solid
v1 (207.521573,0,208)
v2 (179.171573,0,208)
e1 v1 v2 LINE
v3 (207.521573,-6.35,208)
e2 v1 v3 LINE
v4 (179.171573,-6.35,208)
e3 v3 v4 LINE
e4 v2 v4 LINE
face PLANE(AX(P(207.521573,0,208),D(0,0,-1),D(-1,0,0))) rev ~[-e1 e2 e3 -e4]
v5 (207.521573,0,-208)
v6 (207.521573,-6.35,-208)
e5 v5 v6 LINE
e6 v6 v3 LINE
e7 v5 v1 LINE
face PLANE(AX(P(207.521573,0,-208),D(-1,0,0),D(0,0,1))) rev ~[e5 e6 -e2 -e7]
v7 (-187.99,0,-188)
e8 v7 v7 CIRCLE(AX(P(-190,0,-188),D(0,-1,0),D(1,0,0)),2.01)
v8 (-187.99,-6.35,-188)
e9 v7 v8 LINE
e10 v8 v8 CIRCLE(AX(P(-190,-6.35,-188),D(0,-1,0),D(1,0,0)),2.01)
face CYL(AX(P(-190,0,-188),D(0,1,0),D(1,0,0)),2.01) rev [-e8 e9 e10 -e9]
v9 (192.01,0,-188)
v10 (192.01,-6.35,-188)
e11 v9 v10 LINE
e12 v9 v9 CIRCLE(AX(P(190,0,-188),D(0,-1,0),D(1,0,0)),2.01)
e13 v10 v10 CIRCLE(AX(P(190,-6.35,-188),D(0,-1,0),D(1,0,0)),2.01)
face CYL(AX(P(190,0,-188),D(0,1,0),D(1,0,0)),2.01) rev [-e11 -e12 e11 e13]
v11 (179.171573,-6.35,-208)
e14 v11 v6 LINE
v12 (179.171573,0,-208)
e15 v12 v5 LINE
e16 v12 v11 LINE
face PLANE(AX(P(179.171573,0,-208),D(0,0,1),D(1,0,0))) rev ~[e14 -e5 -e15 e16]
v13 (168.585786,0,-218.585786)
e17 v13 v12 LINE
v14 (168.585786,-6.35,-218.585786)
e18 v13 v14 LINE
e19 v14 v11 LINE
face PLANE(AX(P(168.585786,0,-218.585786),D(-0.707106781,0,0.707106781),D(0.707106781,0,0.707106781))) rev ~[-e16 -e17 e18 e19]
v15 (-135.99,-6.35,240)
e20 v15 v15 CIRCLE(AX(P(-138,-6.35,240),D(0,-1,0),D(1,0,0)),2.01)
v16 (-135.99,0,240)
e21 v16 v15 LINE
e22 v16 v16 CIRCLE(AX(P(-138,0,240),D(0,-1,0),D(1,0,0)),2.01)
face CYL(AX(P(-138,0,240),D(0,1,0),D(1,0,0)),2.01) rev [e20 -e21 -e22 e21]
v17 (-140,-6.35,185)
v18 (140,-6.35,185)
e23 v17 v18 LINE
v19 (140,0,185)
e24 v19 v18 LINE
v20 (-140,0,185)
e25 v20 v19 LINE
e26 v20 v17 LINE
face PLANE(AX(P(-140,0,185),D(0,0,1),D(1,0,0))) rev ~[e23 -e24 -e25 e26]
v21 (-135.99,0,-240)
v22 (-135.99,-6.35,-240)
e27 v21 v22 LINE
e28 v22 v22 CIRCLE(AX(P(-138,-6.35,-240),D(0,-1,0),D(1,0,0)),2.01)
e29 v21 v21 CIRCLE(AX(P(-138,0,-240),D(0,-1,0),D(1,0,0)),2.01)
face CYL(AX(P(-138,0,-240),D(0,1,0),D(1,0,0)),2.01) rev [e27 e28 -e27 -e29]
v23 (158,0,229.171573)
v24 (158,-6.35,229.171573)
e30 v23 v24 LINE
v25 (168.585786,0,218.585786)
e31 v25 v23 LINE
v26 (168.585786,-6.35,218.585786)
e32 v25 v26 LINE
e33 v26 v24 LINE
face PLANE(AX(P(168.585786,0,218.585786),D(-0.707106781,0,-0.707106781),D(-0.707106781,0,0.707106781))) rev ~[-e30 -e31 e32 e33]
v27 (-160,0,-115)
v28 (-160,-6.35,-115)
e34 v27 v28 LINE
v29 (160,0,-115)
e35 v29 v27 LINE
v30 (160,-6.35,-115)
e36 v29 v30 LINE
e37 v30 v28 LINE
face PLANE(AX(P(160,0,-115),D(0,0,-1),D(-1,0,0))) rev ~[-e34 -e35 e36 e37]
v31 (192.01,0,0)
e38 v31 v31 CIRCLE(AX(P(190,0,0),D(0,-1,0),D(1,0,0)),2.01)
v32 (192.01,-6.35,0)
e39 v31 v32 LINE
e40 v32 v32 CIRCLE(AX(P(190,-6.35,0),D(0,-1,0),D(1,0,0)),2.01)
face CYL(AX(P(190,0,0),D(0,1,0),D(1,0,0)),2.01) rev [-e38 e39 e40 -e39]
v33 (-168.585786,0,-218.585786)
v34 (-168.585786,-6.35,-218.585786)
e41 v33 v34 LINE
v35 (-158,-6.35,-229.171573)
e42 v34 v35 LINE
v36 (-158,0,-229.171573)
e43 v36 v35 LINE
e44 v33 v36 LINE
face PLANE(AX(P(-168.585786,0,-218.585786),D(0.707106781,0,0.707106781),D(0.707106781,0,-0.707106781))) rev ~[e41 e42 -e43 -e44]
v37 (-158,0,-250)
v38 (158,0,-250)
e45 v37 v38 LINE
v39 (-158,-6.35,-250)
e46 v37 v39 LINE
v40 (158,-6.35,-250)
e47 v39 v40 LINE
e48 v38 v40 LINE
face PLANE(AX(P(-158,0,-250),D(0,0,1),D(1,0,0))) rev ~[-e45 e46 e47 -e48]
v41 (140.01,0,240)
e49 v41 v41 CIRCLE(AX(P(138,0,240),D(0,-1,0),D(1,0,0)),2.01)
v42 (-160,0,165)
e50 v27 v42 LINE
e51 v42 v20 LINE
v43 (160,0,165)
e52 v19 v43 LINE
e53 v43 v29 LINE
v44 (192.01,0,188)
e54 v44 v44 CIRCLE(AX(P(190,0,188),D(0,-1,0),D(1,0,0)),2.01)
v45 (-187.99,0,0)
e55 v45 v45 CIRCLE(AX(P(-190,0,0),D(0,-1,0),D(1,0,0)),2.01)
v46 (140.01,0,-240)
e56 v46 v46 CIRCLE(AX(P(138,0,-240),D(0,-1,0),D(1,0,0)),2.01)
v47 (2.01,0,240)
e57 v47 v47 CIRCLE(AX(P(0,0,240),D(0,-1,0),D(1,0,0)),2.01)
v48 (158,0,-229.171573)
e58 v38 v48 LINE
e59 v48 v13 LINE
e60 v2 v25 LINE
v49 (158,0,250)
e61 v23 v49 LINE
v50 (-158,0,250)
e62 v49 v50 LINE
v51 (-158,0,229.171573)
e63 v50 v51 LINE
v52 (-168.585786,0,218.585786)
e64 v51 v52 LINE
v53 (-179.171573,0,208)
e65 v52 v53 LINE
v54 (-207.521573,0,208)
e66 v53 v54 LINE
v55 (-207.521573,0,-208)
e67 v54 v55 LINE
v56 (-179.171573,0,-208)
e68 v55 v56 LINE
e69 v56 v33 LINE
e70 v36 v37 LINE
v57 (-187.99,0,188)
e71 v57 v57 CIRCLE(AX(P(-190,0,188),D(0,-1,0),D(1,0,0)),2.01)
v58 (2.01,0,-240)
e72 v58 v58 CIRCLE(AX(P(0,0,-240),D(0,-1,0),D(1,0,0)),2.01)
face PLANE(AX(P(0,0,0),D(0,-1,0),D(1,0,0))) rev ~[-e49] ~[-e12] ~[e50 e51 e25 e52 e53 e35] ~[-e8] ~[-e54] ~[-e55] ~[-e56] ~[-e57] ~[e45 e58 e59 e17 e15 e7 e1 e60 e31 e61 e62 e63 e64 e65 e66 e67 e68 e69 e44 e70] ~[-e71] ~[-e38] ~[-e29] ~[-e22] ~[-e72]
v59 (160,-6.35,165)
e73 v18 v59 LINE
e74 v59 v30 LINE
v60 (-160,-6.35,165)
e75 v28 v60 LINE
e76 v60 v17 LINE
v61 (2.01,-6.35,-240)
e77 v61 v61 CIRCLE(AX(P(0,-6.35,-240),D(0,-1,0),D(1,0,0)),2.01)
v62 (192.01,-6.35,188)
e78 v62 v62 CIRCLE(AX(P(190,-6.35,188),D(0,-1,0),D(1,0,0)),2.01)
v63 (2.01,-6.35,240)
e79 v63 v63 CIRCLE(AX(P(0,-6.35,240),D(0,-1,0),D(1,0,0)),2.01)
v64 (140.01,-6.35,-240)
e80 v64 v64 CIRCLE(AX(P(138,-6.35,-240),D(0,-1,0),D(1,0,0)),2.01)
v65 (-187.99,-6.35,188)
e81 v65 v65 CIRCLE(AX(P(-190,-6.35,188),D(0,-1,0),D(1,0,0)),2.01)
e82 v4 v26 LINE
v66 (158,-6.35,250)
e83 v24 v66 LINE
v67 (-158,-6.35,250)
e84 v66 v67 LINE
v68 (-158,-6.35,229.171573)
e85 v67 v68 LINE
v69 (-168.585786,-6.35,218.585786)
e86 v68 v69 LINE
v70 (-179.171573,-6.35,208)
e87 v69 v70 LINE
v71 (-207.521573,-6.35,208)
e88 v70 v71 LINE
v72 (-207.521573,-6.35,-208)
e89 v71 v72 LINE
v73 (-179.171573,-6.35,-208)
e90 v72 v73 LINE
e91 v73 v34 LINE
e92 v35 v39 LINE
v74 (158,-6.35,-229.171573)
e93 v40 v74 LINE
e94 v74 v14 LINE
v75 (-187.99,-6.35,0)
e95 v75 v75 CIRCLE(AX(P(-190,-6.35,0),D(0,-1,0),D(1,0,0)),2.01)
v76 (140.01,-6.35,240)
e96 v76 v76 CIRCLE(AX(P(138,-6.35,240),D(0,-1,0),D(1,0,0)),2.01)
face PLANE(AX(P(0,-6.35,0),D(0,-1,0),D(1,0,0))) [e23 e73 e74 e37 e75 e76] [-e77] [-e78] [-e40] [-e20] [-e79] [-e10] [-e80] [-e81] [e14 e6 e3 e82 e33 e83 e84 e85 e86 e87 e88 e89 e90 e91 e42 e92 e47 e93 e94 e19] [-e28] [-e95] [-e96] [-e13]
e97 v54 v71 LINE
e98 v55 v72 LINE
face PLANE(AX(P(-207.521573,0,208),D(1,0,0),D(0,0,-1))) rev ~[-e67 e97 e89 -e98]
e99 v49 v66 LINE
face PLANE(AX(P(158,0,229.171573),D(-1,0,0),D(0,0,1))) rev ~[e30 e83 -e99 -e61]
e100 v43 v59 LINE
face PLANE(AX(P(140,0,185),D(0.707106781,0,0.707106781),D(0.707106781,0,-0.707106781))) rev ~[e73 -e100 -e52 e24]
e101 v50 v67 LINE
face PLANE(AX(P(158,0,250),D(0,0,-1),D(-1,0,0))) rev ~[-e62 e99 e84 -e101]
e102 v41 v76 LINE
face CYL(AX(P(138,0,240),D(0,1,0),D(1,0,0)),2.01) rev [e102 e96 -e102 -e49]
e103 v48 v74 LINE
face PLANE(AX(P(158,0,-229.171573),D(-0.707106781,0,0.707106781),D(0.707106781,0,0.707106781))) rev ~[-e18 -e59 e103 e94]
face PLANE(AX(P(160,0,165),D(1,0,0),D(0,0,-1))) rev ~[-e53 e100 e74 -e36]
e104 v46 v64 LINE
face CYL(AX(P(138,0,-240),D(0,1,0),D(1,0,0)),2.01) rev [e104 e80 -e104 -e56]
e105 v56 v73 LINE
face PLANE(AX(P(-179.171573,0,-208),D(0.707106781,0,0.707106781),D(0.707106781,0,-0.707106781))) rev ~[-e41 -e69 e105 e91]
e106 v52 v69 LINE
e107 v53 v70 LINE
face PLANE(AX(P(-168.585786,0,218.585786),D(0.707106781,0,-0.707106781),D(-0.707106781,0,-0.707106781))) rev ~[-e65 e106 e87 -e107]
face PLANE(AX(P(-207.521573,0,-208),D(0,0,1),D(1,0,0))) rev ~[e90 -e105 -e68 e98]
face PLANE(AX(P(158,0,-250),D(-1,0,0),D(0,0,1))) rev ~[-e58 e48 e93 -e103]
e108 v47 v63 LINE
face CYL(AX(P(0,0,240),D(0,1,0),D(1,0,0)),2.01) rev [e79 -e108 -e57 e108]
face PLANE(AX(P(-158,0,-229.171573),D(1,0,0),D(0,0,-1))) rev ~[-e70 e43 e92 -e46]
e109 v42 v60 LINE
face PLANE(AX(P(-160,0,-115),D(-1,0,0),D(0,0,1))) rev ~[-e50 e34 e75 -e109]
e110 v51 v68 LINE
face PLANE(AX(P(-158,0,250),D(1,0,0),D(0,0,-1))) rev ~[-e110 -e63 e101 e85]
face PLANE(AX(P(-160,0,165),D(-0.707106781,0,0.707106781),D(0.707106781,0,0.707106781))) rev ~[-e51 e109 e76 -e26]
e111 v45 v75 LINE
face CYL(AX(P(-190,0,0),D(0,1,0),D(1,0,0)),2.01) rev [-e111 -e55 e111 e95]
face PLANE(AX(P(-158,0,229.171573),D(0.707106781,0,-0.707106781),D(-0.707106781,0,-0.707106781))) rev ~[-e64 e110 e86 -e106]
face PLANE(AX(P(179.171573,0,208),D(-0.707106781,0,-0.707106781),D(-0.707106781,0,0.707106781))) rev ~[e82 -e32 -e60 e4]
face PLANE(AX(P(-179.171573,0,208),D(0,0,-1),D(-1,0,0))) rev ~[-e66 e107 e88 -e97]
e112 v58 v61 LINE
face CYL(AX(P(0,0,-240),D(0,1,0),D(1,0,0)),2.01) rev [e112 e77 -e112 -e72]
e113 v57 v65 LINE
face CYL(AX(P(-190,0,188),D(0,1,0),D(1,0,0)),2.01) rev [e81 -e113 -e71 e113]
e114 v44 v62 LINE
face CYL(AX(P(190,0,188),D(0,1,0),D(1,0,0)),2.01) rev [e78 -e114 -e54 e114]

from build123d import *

# Parameters (mm, degrees)
F0_R     = 2.01
F1_DEPTH = 6.35


# Not quite as in the source:
# - a feature names something its author has since deleted; it is built from what else it names


with BuildPart() as f1:
    # F0 (on Front) → F1 (new body)
    with BuildSketch(Plane.XZ):
        Polygon((158, -229.1715728753), (168.5857864376, -218.5857864376), (179.1715728753, -208), (207.5215728753, -208), (207.5215728753, 208), (179.1715728753, 208), (168.5857864376, 218.5857864376), (158, 229.1715728753), (158, 240), (158, 250), (-158, 250), (-158, 240), (-158, 229.1715728753), (-168.5857864376, 218.5857864376), (-179.1715728753, 208), (-207.5215728753, 208), (-207.5215728753, -208), (-179.1715728753, -208), (-168.5857864376, -218.5857864376), (-158, -229.1715728753), (-158, -240), (-158, -250), (158, -250), (158, -240), align=None)
        with Locations((-190, -188)):
            Circle(F0_R, mode=Mode.SUBTRACT)
        with Locations((-138, -240)):
            Circle(F0_R, mode=Mode.SUBTRACT)
        with Locations((0, -240)):
            Circle(F0_R, mode=Mode.SUBTRACT)
        with Locations((138, -240)):
            Circle(F0_R, mode=Mode.SUBTRACT)
        with Locations((190, -188)):
            Circle(F0_R, mode=Mode.SUBTRACT)
        with Locations((-190, 0)):
            Circle(F0_R, mode=Mode.SUBTRACT)
        with Locations((-190, 188)):
            Circle(F0_R, mode=Mode.SUBTRACT)
        with Locations((-138, 240)):
            Circle(F0_R, mode=Mode.SUBTRACT)
        Polygon((-140, 185), (140, 185), (160, 165), (160, -115), (0, -115), (-160, -115), (-160, 165), align=None, mode=Mode.SUBTRACT)
        with Locations((190, 0)):
            Circle(F0_R, mode=Mode.SUBTRACT)
        with Locations((0, 240)):
            Circle(F0_R, mode=Mode.SUBTRACT)
        with Locations((138, 240)):
            Circle(F0_R, mode=Mode.SUBTRACT)
        with Locations((190, 188)):
            Circle(F0_R, mode=Mode.SUBTRACT)
    extrude(amount=F1_DEPTH)


solid = f1.part
